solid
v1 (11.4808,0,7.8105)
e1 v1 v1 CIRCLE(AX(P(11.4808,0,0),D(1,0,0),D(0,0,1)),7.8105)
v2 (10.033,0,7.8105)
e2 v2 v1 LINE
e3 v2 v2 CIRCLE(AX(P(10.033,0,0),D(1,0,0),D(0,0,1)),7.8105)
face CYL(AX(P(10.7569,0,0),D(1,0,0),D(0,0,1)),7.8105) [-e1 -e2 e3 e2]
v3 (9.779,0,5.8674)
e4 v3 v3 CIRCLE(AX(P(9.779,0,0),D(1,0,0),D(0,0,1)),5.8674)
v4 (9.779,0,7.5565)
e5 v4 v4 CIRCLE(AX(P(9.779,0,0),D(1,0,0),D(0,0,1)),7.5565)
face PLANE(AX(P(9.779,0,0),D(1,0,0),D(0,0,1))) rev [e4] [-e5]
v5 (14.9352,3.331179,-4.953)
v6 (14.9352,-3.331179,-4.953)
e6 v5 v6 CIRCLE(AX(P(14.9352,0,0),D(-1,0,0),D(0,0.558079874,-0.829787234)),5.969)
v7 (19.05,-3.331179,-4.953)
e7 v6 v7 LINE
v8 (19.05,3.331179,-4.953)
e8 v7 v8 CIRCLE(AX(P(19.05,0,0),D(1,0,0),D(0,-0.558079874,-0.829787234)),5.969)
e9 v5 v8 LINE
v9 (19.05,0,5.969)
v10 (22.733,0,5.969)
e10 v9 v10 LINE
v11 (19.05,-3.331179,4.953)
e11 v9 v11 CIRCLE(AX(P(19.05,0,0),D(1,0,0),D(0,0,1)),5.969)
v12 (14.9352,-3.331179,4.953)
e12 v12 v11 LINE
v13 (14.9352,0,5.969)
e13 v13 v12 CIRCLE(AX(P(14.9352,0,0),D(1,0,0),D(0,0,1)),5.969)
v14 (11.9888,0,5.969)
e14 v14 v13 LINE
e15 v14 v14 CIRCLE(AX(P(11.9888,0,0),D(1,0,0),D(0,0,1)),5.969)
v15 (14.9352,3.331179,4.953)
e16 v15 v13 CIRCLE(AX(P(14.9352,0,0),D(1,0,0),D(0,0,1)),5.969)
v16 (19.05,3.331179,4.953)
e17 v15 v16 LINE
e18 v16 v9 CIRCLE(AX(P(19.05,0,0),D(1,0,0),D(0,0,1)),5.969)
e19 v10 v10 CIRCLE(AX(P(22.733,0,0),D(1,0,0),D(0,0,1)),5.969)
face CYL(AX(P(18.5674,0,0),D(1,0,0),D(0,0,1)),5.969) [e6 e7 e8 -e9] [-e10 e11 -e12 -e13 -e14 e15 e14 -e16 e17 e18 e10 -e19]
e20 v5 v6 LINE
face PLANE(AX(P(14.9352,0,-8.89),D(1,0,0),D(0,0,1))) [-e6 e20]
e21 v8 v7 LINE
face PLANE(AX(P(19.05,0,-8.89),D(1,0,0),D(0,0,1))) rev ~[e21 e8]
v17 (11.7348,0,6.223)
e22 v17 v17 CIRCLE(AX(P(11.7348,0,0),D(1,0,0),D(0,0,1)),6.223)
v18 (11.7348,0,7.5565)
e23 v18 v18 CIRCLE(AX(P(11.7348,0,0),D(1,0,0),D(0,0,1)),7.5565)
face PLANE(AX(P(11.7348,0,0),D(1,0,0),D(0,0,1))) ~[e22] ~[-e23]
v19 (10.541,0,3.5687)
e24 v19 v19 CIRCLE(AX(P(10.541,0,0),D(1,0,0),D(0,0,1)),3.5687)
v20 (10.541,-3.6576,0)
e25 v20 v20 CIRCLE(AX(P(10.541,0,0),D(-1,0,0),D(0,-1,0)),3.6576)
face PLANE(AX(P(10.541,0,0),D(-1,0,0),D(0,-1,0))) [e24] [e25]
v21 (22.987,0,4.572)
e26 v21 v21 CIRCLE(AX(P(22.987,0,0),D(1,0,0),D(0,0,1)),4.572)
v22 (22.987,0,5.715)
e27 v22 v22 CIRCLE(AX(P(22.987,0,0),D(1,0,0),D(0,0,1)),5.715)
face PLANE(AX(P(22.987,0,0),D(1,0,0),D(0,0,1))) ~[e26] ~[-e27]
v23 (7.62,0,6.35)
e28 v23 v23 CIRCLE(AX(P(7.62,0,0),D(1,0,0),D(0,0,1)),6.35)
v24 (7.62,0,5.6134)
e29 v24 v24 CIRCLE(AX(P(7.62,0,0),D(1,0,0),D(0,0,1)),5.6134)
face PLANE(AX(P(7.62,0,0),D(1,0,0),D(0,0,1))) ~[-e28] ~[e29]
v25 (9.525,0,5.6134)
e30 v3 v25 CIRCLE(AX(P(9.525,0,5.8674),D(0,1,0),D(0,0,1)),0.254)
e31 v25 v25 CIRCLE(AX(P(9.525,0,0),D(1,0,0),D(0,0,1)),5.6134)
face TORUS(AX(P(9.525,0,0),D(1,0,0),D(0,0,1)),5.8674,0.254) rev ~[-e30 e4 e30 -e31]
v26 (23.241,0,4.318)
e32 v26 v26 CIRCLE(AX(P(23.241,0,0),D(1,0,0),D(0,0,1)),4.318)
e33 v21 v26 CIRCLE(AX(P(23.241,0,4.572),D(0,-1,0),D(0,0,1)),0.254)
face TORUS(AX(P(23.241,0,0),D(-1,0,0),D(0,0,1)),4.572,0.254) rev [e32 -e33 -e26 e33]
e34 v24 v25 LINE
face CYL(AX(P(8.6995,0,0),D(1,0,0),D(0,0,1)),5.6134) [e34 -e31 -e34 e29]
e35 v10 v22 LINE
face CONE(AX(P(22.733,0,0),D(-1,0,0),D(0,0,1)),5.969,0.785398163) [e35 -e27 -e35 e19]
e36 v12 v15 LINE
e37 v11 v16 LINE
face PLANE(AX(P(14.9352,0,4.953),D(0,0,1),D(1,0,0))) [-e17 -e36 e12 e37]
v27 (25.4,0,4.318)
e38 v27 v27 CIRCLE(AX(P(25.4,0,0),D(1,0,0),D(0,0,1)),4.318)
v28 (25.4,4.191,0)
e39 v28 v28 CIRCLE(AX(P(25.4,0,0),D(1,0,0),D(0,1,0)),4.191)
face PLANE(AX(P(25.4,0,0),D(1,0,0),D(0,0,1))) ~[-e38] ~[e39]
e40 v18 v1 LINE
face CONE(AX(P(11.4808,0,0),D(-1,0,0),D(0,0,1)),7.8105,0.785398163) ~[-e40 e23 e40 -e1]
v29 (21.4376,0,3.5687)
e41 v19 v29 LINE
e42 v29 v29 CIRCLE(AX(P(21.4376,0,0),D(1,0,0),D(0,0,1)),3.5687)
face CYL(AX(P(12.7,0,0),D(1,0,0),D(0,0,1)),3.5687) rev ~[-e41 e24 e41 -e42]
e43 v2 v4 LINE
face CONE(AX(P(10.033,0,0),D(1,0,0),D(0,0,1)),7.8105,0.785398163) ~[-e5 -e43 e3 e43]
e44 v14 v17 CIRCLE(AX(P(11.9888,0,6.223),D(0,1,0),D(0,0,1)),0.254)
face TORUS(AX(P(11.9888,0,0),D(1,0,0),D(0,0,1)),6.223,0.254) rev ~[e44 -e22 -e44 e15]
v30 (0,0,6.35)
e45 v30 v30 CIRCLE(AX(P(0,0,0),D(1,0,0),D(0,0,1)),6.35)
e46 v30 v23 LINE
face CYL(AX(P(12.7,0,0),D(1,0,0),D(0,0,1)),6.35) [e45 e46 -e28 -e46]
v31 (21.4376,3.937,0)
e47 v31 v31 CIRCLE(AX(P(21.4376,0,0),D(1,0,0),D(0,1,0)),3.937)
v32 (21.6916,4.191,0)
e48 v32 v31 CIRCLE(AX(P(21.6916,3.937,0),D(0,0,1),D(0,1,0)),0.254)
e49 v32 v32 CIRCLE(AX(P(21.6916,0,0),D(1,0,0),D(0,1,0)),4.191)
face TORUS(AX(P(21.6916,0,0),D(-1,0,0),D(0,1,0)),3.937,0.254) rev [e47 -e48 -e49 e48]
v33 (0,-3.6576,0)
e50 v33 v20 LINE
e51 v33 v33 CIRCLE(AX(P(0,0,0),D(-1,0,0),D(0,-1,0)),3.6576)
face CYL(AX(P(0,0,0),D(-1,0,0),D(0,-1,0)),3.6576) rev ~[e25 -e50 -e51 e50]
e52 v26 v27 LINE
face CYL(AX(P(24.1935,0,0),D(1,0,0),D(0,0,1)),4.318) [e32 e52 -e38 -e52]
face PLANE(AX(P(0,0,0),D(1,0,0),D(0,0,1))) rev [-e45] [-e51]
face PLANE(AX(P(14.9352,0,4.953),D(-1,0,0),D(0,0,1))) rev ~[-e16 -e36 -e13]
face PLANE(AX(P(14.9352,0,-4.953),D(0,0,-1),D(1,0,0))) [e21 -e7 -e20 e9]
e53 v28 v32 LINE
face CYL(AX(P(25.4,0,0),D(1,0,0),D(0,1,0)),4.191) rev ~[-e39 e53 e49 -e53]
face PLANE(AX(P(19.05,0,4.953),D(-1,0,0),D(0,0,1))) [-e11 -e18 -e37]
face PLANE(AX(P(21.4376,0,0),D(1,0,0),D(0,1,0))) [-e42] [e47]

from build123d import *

# Parameters (mm, degrees)
F0_W           = 25.4
F0_H           = 2.7813
F2_W           = 1.9558
F2_H           = 1.4605
F4_W           = 13.6652
F4_H           = 2.921
F6_W           = 2.159
F6_H           = 3.2766
F6_W_2         = 2.413
F6_H_2         = 4.572
F8_R           = 3.6576
F9_DEPTH       = 10.541
F10_R          = 4.191
F11_DEPTH      = 3.9624
F12_W          = 4.1148
F12_H          = 3.937
F13_DEPTH      = 7.8115
F13_DEPTH_BACK = 7.8115
F14_SIZE       = 0.254
F15_SIZE       = 0.254
F16_R          = 0.254


# Not quite as in the source:
# - a feature of the source that left no trace in its solid (it failed there, or was rolled back) is left out


with BuildPart() as f1:
    # F0 (on Front) → F1 (revolve)
    with BuildSketch(Plane.XZ):
        with Locations((12.7, 4.95935)):
            Rectangle(F0_W, F0_H)
    revolve(axis=Axis((6.9021734883, 0, 0), (1, 0, 0)))

    # F2 (on Front) → F3 (revolve)
    with BuildSketch(Plane.XZ):
        with Locations((10.7569, 7.08025)):
            Rectangle(F2_W, F2_H)
    revolve(axis=Axis((12.3426117934, 0, 0), (1, 0, 0)))

    # F4 (on Front) → F5 (revolve, cut)
    with BuildSketch(Plane.XZ):
        with Locations((18.5674, 7.4295)):
            Rectangle(F4_W, F4_H)
    revolve(axis=Axis((16.2136404502, 0, 0), (1, 0, 0)), mode=Mode.SUBTRACT)

    # F6 (on Front) → F7 (revolve, cut)
    with BuildSketch(Plane.XZ):
        with Locations((8.6995, 7.2517)):
            Rectangle(F6_W, F6_H)
        with Locations((24.1935, 6.604)):
            Rectangle(F6_W_2, F6_H_2)
    revolve(axis=Axis((7.4812129023, 0, 0), (1, 0, 0)), mode=Mode.SUBTRACT)

    # F8 (on face) → F9 (cut)
    with BuildSketch(Plane(origin=(0, 0, 0), x_dir=(0, -1, 0), z_dir=(-1, 0, 0))):
        Circle(F8_R)
    extrude(amount=-F9_DEPTH, mode=Mode.SUBTRACT)

    # F10 (on face) → F11 (cut)
    with BuildSketch(Plane.YZ.offset(25.4)):
        Circle(F10_R)
    extrude(amount=-F11_DEPTH, mode=Mode.SUBTRACT)

    # F12 (on Front) → F13 (cut, two sides)
    with BuildSketch(Plane.XZ) as f13_sk:
        with Locations((16.9926, 6.9215)):
            Rectangle(F12_W, F12_H)
        with Locations((16.9926, -6.9215)):
            Rectangle(F12_W, F12_H)
    extrude(amount=-F13_DEPTH, mode=Mode.SUBTRACT)
    extrude(f13_sk.sketch, amount=F13_DEPTH_BACK, mode=Mode.SUBTRACT)

    # F14
    f14_edges = [f1.edges().sort_by_distance(p)[0] for p in [
        (9.779, 0, -7.8105),
        (11.7348, 0, -7.8105),
    ]]
    chamfer(f14_edges, length=F14_SIZE)

    # F15
    f15_edges = [f1.edges().sort_by_distance(p)[0] for p in [
        (22.987, 0, -5.969),
    ]]
    chamfer(f15_edges, length=F15_SIZE)

    # F16
    f16_edges = [f1.edges().sort_by_distance(p)[0] for p in [
        (9.779, 0, -5.6134),
        (11.7348, 0, -5.969),
        (22.987, 0, -4.318),
        (21.4376, -4.191, 0),
    ]]
    fillet(f16_edges, radius=F16_R)


solid = f1.part
